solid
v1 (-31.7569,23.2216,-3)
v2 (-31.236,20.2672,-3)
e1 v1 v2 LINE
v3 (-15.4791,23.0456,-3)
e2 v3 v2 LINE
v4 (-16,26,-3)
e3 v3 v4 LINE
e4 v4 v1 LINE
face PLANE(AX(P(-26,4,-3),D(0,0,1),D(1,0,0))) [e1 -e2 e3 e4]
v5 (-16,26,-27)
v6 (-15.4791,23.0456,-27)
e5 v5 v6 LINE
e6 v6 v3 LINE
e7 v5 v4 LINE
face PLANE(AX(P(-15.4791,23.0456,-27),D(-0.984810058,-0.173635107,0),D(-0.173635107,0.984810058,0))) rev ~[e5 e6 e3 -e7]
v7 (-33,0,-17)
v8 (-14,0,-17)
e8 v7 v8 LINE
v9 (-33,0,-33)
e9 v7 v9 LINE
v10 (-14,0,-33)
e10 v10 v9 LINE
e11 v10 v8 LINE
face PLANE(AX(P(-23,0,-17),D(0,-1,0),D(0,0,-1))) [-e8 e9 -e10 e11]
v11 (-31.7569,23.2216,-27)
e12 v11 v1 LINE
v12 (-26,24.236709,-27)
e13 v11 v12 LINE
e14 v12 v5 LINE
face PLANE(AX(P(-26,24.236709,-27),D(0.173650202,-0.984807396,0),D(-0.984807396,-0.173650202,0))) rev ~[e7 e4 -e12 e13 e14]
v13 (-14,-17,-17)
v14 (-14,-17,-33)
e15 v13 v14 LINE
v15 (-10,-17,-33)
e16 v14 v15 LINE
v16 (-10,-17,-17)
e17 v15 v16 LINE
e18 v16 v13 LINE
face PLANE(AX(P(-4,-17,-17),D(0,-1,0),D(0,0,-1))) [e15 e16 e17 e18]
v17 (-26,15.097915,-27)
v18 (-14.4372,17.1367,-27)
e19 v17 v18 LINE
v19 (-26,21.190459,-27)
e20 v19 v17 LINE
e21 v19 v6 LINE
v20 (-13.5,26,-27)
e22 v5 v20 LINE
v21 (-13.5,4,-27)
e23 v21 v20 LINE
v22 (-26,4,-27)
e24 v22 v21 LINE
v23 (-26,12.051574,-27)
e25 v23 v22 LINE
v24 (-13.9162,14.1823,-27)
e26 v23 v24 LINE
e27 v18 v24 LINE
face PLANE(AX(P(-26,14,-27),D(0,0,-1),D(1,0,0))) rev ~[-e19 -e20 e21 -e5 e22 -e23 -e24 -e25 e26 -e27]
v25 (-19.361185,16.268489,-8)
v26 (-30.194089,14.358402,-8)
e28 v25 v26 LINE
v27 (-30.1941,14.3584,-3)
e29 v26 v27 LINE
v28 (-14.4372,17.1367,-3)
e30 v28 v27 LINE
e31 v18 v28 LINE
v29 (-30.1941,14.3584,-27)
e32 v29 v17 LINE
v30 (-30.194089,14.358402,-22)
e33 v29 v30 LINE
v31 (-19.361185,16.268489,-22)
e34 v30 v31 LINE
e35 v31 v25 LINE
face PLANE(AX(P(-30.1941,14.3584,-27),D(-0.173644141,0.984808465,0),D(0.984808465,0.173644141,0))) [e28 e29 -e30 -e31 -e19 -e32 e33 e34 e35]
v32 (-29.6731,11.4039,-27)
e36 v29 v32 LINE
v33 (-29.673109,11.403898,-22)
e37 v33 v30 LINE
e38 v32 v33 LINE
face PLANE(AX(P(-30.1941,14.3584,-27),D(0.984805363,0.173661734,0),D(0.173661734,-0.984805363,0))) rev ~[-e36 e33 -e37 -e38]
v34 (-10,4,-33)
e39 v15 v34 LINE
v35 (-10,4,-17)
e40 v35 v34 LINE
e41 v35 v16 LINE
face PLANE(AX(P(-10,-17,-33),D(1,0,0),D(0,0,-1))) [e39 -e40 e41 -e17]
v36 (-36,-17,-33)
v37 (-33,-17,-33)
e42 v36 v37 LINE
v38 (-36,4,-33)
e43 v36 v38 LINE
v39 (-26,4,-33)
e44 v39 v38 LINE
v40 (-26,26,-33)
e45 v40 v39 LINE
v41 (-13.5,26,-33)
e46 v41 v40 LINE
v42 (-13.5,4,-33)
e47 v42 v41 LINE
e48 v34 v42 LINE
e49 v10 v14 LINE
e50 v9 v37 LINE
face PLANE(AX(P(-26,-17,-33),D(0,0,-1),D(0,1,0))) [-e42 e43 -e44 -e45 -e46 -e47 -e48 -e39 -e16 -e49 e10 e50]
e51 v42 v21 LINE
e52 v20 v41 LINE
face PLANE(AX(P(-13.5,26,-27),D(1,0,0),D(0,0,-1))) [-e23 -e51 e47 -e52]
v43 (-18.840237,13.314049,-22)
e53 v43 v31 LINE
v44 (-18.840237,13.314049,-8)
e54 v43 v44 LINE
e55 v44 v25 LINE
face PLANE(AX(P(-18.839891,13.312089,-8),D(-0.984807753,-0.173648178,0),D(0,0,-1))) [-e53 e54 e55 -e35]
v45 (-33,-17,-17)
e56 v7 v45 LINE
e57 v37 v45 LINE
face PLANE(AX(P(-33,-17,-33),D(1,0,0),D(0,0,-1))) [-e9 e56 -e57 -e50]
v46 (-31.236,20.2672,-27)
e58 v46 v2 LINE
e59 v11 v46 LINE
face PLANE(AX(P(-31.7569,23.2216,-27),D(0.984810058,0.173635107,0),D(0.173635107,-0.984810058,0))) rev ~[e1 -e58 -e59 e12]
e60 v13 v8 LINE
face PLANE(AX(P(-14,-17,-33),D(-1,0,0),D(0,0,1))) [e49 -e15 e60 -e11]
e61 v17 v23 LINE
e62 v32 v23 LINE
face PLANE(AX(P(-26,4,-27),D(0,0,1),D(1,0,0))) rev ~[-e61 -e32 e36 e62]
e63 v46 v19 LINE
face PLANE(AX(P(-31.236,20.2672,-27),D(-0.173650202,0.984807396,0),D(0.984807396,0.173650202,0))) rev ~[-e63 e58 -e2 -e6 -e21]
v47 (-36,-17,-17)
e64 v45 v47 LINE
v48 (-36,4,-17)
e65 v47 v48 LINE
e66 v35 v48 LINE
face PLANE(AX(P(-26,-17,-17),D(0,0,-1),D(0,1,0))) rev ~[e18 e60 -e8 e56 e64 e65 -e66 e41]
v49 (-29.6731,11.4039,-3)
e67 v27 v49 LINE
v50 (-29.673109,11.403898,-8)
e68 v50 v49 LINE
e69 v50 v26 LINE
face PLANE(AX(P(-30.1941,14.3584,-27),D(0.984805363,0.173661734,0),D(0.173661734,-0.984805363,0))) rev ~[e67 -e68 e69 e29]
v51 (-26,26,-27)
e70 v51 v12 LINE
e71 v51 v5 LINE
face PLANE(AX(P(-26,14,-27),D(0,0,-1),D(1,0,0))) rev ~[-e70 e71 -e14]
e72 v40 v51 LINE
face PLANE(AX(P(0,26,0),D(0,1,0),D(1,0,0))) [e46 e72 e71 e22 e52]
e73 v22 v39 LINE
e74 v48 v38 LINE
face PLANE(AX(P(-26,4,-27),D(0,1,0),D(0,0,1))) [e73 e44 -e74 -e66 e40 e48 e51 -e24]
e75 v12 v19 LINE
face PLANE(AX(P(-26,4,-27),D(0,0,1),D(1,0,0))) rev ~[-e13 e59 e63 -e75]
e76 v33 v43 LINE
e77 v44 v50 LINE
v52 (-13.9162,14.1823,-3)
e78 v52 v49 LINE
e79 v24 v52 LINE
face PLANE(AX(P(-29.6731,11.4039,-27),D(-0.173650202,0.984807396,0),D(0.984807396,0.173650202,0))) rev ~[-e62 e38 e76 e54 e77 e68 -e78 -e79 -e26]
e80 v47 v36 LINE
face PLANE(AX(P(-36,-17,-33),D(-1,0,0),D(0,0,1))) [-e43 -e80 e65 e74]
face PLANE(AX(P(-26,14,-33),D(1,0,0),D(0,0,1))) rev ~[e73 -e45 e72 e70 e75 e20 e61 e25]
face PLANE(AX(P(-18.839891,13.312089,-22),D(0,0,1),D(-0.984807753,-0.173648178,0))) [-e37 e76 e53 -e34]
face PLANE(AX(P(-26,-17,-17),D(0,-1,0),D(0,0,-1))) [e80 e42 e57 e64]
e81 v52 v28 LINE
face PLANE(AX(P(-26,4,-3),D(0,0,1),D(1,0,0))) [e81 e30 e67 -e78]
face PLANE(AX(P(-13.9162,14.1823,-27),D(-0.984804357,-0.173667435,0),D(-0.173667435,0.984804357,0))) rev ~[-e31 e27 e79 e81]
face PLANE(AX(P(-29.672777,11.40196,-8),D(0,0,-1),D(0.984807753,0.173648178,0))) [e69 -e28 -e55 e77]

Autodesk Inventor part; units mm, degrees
ref_plane "YZ Plane" through (0, 0, 0) normal (1, 0, 0) x (0, 1, 0)
ref_plane "XZ Plane" through (0, 0, 0) normal (0, 1, 0) x (-1, 0, 0)
ref_plane "XY Plane" through (0, 0, 0) normal (0, 0, 1) x (1, 0, 0)
sketch "Sketch1" plane through (0, 0, 0) normal (0, 1, 0) x (-1, 0, 0)
  line L0 (0, 0) -> (26, 0)
  line L1 (26, 0) -> (26, -33)
  line L2 (26, -33) -> (0, -33)
  line L3 (0, -33) -> (0, 0)
  dimension "d0" = 26
  dimension "d1" = 33
extrude "Extrusion1" add sketch "Sketch1" along normal blind 4
sketch "Sketch2" plane through (0, 0, 0) normal (0, -1, 0) x (1, 0, 0)
  line L0 (-26, 0) -> (0, 0) projected
  line L1 (-26, -33) -> (-26, 0) projected
  line L2 (0, -33) -> (-26, -33) projected
  line L3 (0, 0) -> (0, -33) projected
  line L4 (-26, 0) -> (0, 0) projected
  line L5 (-26, -33) -> (-26, 0) projected
  line L6 (0, 0) -> (0, -33) projected
  line L7 (0, -33) -> (-26, -33) projected
  line L8 (0, 0) -> (-4, 0)
  line L9 (-4, 0) -> (-4, -33)
  line L10 (-4, -33) -> (0, -33)
  line L11 (0, -33) -> (0, 0)
  line L12 (-26, -33) -> (-26, 0) projected
  line L13 (-26, 0) -> (-23, 0)
  line L14 (-23, 0) -> (-23, -33)
  line L15 (-23, -33) -> (-26, -33)
  line L16 (-26, -33) -> (-26, 0)
  dimension "d4" = 4
  dimension "d5" = 3
extrude "Extrusion2" add sketch "Sketch2" along normal blind 17 contours L0 L14 L2 L1 | L0 L3 L2 L9
sketch "Sketch3" plane through (0, 4, 0) normal (0, 1, 0) x (1, 0, 0)
  line L0 (0, 33) -> (-26, 33) projected
  line L1 (-26, 33) -> (-26, 0) projected
  line L2 (-26, 0) -> (0, 0) projected
  line L3 (0, 0) -> (0, 33) projected
  line L4 (0, 0) -> (-6, 0)
  line L5 (-6, 0) -> (-6, 33)
  line L6 (-6, 33) -> (0, 33)
  line L7 (0, 33) -> (0, 0)
  line L8 (-6, 33) -> (-26, 33)
  line L9 (-26, 33) -> (-26, 27)
  line L10 (-26, 27) -> (-6, 27)
  line L11 (-6, 27) -> (-6, 33)
  dimension "d8" = 6
  dimension "d9" = 6
extrude "Extrusion3" add sketch "Sketch3" along normal blind 10 contours L5 L10 L1 L0
sketch "Sketch4" plane through (-26, 4, -27) normal (0, 0, 1) x (1, 0, 0)
  line L0 (20, 0) -> (0, 0) projected
  line L1 (20, 0) -> (20, 10) projected
  line L2 (0, 10) -> (20, 10) projected
  line L3 (0, 0) -> (0, 10) projected
  line L4 (20, 10) -> (6, 10)
  line L5 (6, 10) -> (6, 7)
  line L6 (6, 7) -> (20, 7)
  line L7 (20, 7) -> (20, 10)
  line L8 (20, 7) -> (6, 7)
  line L9 (6, 7) -> (6, 1)
  line L10 (6, 1) -> (20, 1)
  line L11 (20, 1) -> (20, 7)
  point P0 (26, -4)
  dimension "d12" = 14
  dimension "d13" = 3
  dimension "d14" = 6
sketch "Sketch5" plane through (0, 14, 0) normal (0, 1, 0) x (1, 0, 0)
  line L0 (-6, 27) -> (-6, 33) projected
  line L1 (-6, 33) -> (-26, 33) projected
  line L2 (-26, 33) -> (-26, 27) projected
  line L3 (-26, 27) -> (-6, 27) projected
  line L4 (-26, 33) -> (-6, 33)
  line L5 (-6, 33) -> (-6, 27)
  line L6 (-6, 27) -> (-26, 27)
  line L7 (-26, 27) -> (-26, 33)
  point P0 (0, 0)
extrude "Extrusion4" add sketch "Sketch5" along normal blind 12
sketch "Sketch6" plane through (-26, 4, -27) normal (0, 0, 1) x (1, 0, 0)
  line L0 (20, 0) -> (20, 22) projected
  line L1 (20, 22) -> (4.2431, 19.2216)
  line L2 (20, 22) -> (36, 22) construction
  line L3 (4.2431, 19.2216) -> (4.764, 16.2672)
  line L4 (4.764, 16.2672) -> (20.5209, 19.0456)
  line L5 (20.5209, 19.0456) -> (20, 22)
  line L6 (4.764, 16.2672) -> (5.8059, 10.3584)
  line L7 (5.8059, 10.3584) -> (6.3269, 7.4039)
  line L8 (6.3269, 7.4039) -> (22.0838, 10.1823)
  line L9 (22.0838, 10.1823) -> (21.5628, 13.1367)
  line L10 (21.5628, 13.1367) -> (5.8059, 10.3584)
  line L11 (20, 0) -> (0, 0) projected
  line L12 (20, 0) -> (20, 22) projected
  line L13 (0, 22) -> (20, 22) projected
  line L14 (0, 0) -> (0, 22) projected
  line L15 (0, -21) -> (0, 22) projected
  line L16 (20, 22) -> (10, 22)
  line L17 (20, 22) -> (0, 22) projected
  line L18 (10, 22) -> (-5.7569, 19.2216)
  line L19 (10, 22) -> (26, 22) construction
  line L20 (-5.7569, 19.2216) -> (-5.236, 16.2672)
  line L21 (-5.236, 16.2672) -> (10.5209, 19.0456)
  line L22 (10.5209, 19.0456) -> (10, 22)
  line L23 (-5.236, 16.2672) -> (-4.1941, 10.3584)
  line L24 (-5.236, 16.2672) -> (0.764, 16.2672) construction
  line L25 (-4.1941, 10.3584) -> (11.5628, 13.1367)
  line L26 (11.5628, 13.1367) -> (10.5209, 19.0456)
  line L27 (-4.1941, 10.3584) -> (-3.6731, 7.4039)
  line L28 (-4.1941, 10.3584) -> (-1.1941, 10.3584) construction
  line L29 (-3.6731, 7.4039) -> (12.0838, 10.1823)
  line L30 (12.0838, 10.1823) -> (11.5628, 13.1367)
  point P0 (26, -4)
  dimension "d17" = 16
  dimension "d18" = 170
  dimension "d19" = 3
  dimension "d20" = 6
  dimension "d21" = 3
  dimension "d22" = 16
  dimension "d27" = 16
  dimension "d28" = 170
  dimension "d29" = 16
  dimension "d30" = 6
  dimension "d31" = 80
  dimension "d32" = 3
  dimension "d33" = 80
  dimension "d34" = 16
extrude "Extrusion5" add sketch "Sketch6" along normal blind 24 contours L29 L27 L25 L14 | L14 L25 L6 L7 L29 | L30 L29 L7 L10 | L10 L6 L25 L30 | L21 L20 L18 L14 | L14 L18 L22 L1 L3 L21 | L22 L21 L3 L1
sketch "Sketch7" plane through (-26, 4, 0) normal (0, 0, 1) x (1, 0, 0)
  line L0 (3, -4) -> (22, -4) projected
  line L1 (22, -4) -> (22, -21) projected
  line L2 (26, -21) -> (22, -21) projected
  line L3 (26, -21) -> (26, 0) projected
  line L4 (0, 0) -> (26, 0) projected
  line L5 (0, -21) -> (0, 0) projected
  line L6 (3, -21) -> (0, -21) projected
  line L7 (3, -4) -> (3, -21) projected
  line L8 (0, -21) -> (3, -21) projected
  line L9 (20, 0) -> (0, 0) projected
  line L10 (3, -21) -> (0, -21)
  line L11 (0, -21) -> (0, 0)
  line L12 (0, 0) -> (3, 0)
  line L13 (3, 0) -> (3, -21)
  line L14 (26, -4) -> (0, -4)
  line L15 (0, -4) -> (0, 0)
  line L16 (0, 0) -> (26, 0)
  line L17 (26, 0) -> (26, -4)
  line L18 (22, -4) -> (22, -21) projected
  line L19 (26, -4) -> (22, -4)
  line L20 (22, -4) -> (22, -21)
  line L21 (22, -21) -> (26, -21)
  line L22 (26, -21) -> (26, -4)
extrude "Extrusion6" cut sketch "Sketch7" against normal blind 17
sketch "Sketch8" plane through (-26, 4, -27) normal (0, 0, 1) x (1, 0, 0)
  line L0 (11.5628, 13.1367) -> (-4.1941, 10.3584) projected
  line L1 (-4.1941, 10.3584) -> (-3.6731, 7.4039) projected
  line L2 (-3.6731, 7.4039) -> (12.0838, 10.1823) projected
  line L3 (12.0838, 10.1823) -> (11.5628, 13.1367) projected
  line L4 (12.0838, 10.1823) -> (0, 8.0516) projected
  line L5 (0, 0) -> (0, 8.0516) projected
  line L6 (20, 0) -> (0, 0) projected
  line L7 (20, 0) -> (20, 22) projected
  line L8 (10, 22) -> (20, 22) projected
  line L9 (10, 22) -> (10.5209, 19.0456) projected
  line L10 (10.5209, 19.0456) -> (0, 17.1905) projected
  line L11 (0, 11.0979) -> (0, 17.1905) projected
  line L12 (0, 11.0979) -> (11.5628, 13.1367) projected
  line L13 (11.5628, 13.1367) -> (12.0838, 10.1823) projected
  point P0 (26, -4)
sketch "Sketch9" plane through (-26, -17, -33) normal (-1, 0, 0) x (0, 0, 1)
  line L0 (16, 0) -> (16, 21) projected
  line L1 (6, 21) -> (16, 21) projected
  line L2 (6, 21) -> (6, 29.0516) projected
  line L3 (6, 29.0516) -> (6, 32.0979) projected
  line L4 (6, 32.0979) -> (6, 38.1905) projected
  line L5 (6, 38.1905) -> (6, 41.2367) projected
  line L6 (6, 41.2367) -> (6, 43) projected
  line L7 (0, 43) -> (6, 43) projected
  line L8 (0, 0) -> (0, 43) projected
  line L9 (16, 0) -> (0, 0) projected
  line L10 (0, 17) -> (0, 0) projected
  line L11 (16, 21) -> (0, 21)
  line L12 (0, 21) -> (0, 0)
  line L13 (0, 0) -> (16, 0)
  line L14 (16, 0) -> (16, 21)
  point P0 (33, 17)
sketch "Sketch10" plane through (-4, -17, -33) normal (-1, 0, 0) x (0, 0, 1)
  line L0 (16, 0) -> (16, 17) projected
  line L1 (0, 17) -> (16, 17) projected
  line L2 (0, 17) -> (0, 0) projected
  line L3 (16, 0) -> (0, 0) projected
  line L4 (16, 17) -> (0, 17)
  line L5 (0, 17) -> (0, 0)
  line L6 (0, 0) -> (16, 0)
  line L7 (16, 0) -> (16, 17)
  point P0 (33, 17)
sketch "Sketch11" plane through (-23, -17, -33) normal (1, 0, 0) x (0, 0, -1)
  line L0 (-16, 17) -> (-16, 0) projected
  line L1 (0, 0) -> (-16, 0) projected
  line L2 (0, 17) -> (0, 0) projected
  line L3 (-16, 17) -> (0, 17) projected
  line L4 (-16, 17) -> (0, 17)
  line L5 (0, 17) -> (0, 0)
  line L6 (0, 0) -> (-16, 0)
  line L7 (-16, 0) -> (-16, 17)
  point P0 (-33, 17)
sketch "Sketch12" plane through (0, -17, -33) normal (1, 0, 0) x (0, 0, -1)
  line L0 (-16, 21) -> (-16, 0) projected
  line L1 (0, 0) -> (-16, 0) projected
  line L2 (0, 21) -> (0, 0) projected
  line L3 (-16, 21) -> (0, 21) projected
  line L4 (0, 17) -> (-16, 17) projected
  line L5 (-16, 21) -> (0, 21)
  line L6 (0, 21) -> (0, 0)
  line L7 (0, 0) -> (-16, 0)
  line L8 (-16, 0) -> (-16, 21)
  point P0 (-33, 17)
extrude "Extrusion7" add sketch "Sketch10" along normal blind 10
extrude "Extrusion8" cut sketch "Sketch12" against normal blind 10
extrude "Extrusion9" add sketch "Sketch9" along normal blind 10 contours L9 L8 L11 L1 L0
extrude "Extrusion10" cut sketch "Sketch11" against normal blind 10
sketch "Sketch13" plane through (-26, 4, -17) normal (0, 0, 1) x (1, 0, 0)
  point P0 (26, -4)
sketch "Sketch15" plane through (-13.9162, 14.1823, -27) normal (0.1736482, -0.9848078, 0) x (0.9848078, 0.1736482, 0)
  line L0 (-16, 0) -> (-12.2702, 0) projected
  line L1 (0, 0) -> (-12.2702, 0) projected
  line L2 (0, 0) -> (0, 24) projected
  line L3 (-16, 24) -> (0, 24) projected
  line L4 (-16, 0) -> (-16, 24) projected
  line L5 (-16, 0) -> (-16, 5)
  line L6 (-16, 24) -> (-16, 19)
  line L7 (-16, 24) -> (-11, 24) construction
  line L8 (-16, 19) -> (-5, 19)
  line L9 (-5, 19) -> (-5, 5)
  line L10 (-5, 5) -> (-16, 5)
  line L11 (-16, 5) -> (-16, 19)
  point P0 (11.2421, 27)
  dimension "d43" = 5
  dimension "d44" = 5
  dimension "d45" = 90
  dimension "d46" = 11
extrude "Extrusion11" cut sketch "Sketch15" against normal blind 4 contours L4 L8 L9 L10
sketch "Sketch16" plane through (-6, 26, -27) normal (1, 0, 0) x (0, 0, -1)
  point P0 (-27, -26)
sketch "Sketch17" plane through (-6, 26, -27) normal (1, 0, 0) x (0, 0, -1)
  line L0 (6, -22) -> (0, -22) projected
  line L1 (6, -22) -> (6, 0) projected
  line L2 (0, 0) -> (6, 0) projected
  line L3 (0, -22) -> (0, 0) projected
  line L4 (0, 0) -> (6, 0)
  line L5 (6, 0) -> (6, -22)
  line L6 (6, -22) -> (0, -22)
  line L7 (0, -22) -> (0, 0)
  point P0 (-27, -26)
extrude "Extrusion12" cut sketch "Sketch17" against normal blind 7.5
properties part number "HolderMagasin_3DPrint"
